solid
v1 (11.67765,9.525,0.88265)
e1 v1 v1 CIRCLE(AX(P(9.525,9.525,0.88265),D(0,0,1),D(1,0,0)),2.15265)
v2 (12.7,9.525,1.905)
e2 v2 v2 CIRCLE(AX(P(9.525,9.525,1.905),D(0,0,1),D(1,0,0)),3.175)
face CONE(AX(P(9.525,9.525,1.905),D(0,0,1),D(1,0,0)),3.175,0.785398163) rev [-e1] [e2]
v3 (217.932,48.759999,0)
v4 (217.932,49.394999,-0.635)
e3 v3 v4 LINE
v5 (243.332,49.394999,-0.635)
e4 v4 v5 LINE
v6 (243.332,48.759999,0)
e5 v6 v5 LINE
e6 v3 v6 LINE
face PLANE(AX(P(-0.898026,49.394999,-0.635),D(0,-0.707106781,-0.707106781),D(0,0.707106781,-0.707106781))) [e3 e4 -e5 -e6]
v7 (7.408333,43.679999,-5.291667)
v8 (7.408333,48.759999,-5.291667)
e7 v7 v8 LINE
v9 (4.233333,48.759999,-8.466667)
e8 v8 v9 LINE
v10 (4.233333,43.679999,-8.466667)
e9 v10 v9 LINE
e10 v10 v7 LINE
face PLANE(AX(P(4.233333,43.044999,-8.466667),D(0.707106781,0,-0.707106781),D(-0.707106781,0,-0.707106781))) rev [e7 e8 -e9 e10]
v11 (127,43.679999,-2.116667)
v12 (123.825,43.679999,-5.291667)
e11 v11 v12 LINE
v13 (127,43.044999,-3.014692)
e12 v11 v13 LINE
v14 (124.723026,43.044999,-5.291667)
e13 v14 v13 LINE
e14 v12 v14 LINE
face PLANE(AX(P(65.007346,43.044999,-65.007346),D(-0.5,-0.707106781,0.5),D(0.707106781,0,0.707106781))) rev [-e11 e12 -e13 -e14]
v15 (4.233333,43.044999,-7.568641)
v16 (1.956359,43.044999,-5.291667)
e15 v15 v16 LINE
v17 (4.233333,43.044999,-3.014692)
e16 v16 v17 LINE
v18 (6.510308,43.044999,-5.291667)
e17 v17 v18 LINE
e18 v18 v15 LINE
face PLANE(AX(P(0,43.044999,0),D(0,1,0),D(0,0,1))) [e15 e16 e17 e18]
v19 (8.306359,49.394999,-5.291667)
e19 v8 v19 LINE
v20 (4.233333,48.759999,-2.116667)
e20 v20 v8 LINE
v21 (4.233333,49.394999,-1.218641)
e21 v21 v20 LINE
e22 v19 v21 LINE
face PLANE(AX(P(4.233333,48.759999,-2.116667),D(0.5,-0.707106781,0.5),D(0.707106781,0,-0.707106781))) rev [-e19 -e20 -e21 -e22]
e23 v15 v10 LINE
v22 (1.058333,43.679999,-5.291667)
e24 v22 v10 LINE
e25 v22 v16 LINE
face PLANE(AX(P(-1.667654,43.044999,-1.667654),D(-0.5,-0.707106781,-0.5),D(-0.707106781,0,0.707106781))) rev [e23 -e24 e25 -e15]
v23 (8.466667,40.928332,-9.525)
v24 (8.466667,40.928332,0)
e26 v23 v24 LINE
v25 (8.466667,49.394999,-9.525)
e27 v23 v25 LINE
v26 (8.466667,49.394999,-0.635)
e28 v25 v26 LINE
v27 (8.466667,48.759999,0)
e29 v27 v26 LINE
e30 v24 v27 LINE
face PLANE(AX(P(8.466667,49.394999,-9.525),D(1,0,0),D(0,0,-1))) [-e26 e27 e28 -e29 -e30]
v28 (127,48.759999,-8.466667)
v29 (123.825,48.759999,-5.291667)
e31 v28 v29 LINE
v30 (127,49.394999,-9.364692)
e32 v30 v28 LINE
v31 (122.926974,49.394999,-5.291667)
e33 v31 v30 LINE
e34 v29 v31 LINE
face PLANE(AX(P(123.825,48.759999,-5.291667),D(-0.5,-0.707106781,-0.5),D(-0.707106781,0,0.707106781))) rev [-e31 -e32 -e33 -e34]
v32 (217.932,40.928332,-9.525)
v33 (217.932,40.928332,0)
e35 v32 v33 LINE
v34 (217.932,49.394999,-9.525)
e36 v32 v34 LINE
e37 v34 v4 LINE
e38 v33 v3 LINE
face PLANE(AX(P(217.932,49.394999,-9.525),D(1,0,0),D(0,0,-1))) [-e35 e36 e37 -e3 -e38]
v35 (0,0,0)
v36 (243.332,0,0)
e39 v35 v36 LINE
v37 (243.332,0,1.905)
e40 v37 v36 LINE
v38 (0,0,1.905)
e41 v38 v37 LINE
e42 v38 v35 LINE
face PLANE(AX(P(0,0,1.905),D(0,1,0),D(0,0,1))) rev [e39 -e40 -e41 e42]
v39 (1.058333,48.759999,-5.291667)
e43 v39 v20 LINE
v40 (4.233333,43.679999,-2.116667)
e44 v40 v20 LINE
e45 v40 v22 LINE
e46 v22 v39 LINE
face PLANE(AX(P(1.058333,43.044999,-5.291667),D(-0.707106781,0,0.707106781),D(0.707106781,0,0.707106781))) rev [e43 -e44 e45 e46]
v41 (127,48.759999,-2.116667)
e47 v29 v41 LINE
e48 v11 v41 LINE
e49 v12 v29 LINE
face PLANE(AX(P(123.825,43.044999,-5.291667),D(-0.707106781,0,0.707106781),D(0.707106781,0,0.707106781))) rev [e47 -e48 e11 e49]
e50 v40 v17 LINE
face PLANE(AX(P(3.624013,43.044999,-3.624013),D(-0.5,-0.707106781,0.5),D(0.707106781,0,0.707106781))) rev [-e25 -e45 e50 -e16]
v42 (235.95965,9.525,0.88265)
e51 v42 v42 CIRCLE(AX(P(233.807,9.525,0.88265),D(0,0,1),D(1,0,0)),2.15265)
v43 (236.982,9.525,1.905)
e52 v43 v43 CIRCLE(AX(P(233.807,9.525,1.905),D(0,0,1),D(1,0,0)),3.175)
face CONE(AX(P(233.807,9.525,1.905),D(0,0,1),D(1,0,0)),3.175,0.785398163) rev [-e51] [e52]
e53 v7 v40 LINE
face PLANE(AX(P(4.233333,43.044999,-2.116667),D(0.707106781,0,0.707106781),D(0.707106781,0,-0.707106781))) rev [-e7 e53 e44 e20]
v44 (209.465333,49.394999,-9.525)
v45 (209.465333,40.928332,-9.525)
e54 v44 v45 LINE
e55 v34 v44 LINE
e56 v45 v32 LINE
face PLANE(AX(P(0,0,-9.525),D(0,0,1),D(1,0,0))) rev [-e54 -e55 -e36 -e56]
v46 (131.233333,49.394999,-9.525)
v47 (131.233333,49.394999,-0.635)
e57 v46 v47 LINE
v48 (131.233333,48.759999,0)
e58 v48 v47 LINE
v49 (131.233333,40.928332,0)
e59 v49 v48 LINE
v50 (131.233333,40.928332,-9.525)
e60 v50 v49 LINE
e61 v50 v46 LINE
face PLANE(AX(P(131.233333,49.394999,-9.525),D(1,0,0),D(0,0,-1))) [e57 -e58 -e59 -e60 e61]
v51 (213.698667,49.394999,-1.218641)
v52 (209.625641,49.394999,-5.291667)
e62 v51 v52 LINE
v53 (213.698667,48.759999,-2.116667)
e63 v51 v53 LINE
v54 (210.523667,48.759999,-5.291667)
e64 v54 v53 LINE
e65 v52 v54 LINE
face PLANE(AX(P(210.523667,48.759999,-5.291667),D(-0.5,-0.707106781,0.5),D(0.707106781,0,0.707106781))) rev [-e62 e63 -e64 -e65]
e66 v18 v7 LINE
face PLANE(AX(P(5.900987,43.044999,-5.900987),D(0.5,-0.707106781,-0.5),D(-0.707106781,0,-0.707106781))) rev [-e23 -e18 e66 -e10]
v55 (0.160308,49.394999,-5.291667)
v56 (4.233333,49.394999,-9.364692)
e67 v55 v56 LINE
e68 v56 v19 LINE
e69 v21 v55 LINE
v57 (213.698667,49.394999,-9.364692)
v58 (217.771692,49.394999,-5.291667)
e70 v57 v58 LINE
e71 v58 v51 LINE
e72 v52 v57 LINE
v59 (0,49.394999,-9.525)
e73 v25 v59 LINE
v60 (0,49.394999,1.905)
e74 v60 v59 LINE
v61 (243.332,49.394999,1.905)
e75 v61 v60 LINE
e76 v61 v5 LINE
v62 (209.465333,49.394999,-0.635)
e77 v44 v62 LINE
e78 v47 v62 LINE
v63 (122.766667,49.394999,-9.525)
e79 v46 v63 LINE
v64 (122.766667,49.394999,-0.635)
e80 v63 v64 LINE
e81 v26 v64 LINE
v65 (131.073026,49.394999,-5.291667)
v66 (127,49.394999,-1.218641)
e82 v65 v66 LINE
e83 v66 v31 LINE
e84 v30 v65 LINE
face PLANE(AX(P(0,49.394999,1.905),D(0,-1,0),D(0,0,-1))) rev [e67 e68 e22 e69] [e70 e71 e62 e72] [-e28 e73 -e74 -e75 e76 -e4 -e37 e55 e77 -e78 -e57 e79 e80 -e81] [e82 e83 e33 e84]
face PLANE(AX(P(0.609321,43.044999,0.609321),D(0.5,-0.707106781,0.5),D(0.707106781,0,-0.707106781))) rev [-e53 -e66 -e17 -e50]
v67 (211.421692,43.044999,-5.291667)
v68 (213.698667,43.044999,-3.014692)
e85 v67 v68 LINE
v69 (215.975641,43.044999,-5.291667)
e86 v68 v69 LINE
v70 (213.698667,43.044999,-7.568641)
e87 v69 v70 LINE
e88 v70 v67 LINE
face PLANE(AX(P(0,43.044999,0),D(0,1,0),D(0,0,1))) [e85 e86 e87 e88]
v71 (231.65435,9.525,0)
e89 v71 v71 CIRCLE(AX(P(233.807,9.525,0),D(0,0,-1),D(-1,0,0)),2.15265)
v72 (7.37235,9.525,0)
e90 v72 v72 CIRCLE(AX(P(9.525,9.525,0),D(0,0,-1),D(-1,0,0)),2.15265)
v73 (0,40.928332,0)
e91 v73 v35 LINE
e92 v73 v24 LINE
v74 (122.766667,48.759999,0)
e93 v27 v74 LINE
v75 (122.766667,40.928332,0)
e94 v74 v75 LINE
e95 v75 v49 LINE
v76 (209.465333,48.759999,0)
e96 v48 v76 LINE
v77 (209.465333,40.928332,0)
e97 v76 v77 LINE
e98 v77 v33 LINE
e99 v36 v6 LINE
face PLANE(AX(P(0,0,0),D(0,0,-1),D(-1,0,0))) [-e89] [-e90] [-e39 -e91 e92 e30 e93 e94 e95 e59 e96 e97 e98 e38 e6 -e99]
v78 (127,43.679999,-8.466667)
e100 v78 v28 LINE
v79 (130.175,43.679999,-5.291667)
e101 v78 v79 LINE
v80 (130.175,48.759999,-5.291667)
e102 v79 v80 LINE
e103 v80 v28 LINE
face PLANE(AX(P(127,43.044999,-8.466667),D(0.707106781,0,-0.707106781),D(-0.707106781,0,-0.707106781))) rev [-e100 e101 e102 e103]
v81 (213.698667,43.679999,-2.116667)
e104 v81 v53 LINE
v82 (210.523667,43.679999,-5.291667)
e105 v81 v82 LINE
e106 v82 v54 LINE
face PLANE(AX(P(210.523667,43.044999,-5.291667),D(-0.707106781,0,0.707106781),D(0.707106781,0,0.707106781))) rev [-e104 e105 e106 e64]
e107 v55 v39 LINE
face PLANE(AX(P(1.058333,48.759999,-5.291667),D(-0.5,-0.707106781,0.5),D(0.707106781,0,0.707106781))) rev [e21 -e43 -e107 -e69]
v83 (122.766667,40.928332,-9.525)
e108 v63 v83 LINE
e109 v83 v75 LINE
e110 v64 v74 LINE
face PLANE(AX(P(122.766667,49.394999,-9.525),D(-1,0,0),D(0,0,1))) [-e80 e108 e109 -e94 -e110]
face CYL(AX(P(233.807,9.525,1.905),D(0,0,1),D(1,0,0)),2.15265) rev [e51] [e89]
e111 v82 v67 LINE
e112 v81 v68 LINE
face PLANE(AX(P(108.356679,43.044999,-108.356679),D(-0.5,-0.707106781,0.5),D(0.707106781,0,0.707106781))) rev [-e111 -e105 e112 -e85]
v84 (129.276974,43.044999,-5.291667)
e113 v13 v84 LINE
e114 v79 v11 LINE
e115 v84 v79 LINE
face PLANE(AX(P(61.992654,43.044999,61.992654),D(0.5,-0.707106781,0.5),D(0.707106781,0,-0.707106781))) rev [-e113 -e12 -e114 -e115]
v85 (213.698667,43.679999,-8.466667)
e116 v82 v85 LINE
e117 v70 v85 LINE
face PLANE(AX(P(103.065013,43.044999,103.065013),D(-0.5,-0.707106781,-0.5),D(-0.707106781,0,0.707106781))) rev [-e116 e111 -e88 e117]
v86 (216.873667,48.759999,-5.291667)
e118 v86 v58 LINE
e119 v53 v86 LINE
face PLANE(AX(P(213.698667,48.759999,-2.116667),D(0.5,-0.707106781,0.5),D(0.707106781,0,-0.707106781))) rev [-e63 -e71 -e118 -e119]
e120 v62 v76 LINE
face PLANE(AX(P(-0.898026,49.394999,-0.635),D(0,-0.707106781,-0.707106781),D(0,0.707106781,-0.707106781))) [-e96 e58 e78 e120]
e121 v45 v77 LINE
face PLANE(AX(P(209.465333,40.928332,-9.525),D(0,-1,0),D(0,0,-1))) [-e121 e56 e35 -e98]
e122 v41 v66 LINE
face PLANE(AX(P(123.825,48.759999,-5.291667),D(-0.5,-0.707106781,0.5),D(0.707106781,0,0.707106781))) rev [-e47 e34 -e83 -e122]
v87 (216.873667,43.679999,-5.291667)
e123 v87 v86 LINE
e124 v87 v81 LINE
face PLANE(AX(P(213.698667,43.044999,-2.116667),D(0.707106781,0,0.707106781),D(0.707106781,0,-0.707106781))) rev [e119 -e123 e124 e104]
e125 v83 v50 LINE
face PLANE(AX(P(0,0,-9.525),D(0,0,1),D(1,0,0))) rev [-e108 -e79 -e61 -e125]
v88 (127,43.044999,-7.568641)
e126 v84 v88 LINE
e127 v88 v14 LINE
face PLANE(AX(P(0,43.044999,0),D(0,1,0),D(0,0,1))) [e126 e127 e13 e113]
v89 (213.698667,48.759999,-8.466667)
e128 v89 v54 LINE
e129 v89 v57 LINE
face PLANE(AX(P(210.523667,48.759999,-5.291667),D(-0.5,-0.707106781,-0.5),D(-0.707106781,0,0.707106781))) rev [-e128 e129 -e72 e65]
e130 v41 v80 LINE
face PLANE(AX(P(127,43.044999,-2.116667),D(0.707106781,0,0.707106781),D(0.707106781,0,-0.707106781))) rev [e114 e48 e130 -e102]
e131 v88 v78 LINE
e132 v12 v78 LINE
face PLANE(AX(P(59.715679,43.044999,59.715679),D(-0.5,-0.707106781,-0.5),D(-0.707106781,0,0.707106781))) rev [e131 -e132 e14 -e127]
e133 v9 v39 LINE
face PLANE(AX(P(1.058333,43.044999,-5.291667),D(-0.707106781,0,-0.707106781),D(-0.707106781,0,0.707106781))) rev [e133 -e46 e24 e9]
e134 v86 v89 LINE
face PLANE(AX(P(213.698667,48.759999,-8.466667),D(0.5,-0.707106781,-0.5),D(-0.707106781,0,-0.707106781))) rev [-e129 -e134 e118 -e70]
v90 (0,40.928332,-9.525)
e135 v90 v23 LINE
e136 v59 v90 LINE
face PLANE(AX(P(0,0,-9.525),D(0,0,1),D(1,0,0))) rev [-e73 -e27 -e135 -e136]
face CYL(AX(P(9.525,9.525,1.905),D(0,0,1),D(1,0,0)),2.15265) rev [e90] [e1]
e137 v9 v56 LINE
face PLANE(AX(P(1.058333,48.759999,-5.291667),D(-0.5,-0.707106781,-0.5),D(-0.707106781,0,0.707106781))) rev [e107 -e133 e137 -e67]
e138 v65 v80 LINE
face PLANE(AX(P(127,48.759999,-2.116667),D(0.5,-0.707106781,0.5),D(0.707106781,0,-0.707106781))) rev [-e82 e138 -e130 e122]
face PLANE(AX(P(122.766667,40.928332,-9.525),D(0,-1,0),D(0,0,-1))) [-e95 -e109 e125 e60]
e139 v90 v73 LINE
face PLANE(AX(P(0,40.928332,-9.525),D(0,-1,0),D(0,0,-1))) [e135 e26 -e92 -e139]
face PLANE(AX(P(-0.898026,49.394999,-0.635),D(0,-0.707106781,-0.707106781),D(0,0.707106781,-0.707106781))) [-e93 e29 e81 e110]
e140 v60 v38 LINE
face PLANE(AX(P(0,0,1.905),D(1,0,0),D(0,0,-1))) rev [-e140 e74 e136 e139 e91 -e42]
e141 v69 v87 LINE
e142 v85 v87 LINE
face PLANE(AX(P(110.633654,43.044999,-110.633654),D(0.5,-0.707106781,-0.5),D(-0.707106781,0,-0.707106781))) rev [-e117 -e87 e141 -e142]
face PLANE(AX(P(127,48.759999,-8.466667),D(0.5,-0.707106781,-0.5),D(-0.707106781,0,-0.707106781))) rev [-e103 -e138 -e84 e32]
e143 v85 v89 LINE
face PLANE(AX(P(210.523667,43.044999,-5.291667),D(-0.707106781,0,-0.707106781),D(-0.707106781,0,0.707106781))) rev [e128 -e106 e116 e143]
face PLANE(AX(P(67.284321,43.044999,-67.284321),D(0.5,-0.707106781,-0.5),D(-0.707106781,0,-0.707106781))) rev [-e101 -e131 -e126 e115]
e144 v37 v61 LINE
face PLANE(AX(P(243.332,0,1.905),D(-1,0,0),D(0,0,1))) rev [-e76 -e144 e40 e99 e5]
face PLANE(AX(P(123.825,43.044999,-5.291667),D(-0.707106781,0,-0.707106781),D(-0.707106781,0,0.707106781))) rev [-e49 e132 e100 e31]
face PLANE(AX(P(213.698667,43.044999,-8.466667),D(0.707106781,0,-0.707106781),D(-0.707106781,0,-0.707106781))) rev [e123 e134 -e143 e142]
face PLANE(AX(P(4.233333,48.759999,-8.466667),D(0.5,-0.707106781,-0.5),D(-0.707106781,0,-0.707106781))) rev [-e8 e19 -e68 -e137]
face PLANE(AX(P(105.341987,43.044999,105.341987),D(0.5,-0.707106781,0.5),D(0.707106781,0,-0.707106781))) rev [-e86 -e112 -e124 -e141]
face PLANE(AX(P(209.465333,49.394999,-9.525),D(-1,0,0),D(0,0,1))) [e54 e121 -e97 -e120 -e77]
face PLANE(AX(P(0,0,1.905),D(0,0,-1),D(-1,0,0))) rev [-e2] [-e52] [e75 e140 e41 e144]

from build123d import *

# Parameters (mm, degrees)
SKETCH1_W                       = 243.332
SKETCH1_H                       = 49.394999
BOSS_EXTRUDE1_DEPTH             = 1.905
SKETCH2_W                       = 8.466666667
SKETCH2_H                       = 8.466666667
SKETCH2_W_2                     = 8.466666666
BOSS_EXTRUDE2_DEPTH             = 9.525
CUT_EXTRUDE1_DEPTH              = 6.35
CHAMFER1_SIZE                   = 0.635
BOSS_EXTRUDE3_START             = -234.865333
BOSS_EXTRUDE3_DEPTH             = 234.865333
F_6_CLEARANCE_HOLE1_D           = 4.3053
F_6_CLEARANCE_HOLE1_CSINK_D     = 6.35
F_6_CLEARANCE_HOLE1_CSINK_ANGLE = 90


with BuildPart() as part:
    # Sketch1 → Boss-Extrude1 (new body)
    with BuildSketch(Plane.XY):
        with Locations((121.666, 24.6974995)):
            Rectangle(SKETCH1_W, SKETCH1_H)
    extrude(amount=BOSS_EXTRUDE1_DEPTH)

    # Sketch2 → Boss-Extrude2 (add)
    with BuildSketch(Plane.XY):
        with Locations((4.233333334, 45.161665666)):
            Rectangle(SKETCH2_W, SKETCH2_H)
        with Locations((127, 45.161665666)):
            Rectangle(SKETCH2_W_2, SKETCH2_H)
        with Locations((213.698666667, 45.161665666)):
            Rectangle(SKETCH2_W, SKETCH2_H)
    extrude(amount=-BOSS_EXTRUDE2_DEPTH)

    # Sketch3 → Cut-Extrude1 (cut)
    with BuildSketch(Plane(origin=(0, 49.394999, 0), x_dir=(1, 0, 0), z_dir=(0, 1, 0))):
        Polygon((1.058333333, 5.291666667), (4.233333333, 8.466666667), (7.408333333, 5.291666667), (4.233333333, 2.116666667), align=None)
        Polygon((123.825, 5.291666667), (127, 8.466666667), (130.175, 5.291666667), (127, 2.116666667), align=None)
        Polygon((210.523666667, 5.291666667), (213.698666667, 8.466666667), (216.873666667, 5.291666667), (213.698666667, 2.116666667), align=None)
    extrude(amount=-CUT_EXTRUDE1_DEPTH, mode=Mode.SUBTRACT)

    # Chamfer1
    chamfer1_edges = [part.edges().sort_by_distance(p)[0] for p in [
        (2.645833333, 43.044999, -3.704166667),
        (2.645833333, 43.044999, -6.879166667),
        (5.820833333, 43.044999, -6.879166667),
        (5.820833333, 43.044999, -3.704166667),
        (2.645833333, 49.394999, -3.704166667),
        (5.820833333, 49.394999, -3.704166667),
        (5.820833333, 49.394999, -6.879166667),
        (2.645833333, 49.394999, -6.879166667),
        (125.4125, 43.044999, -3.704166667),
        (125.4125, 43.044999, -6.879166667),
        (128.5875, 43.044999, -6.879166667),
        (128.5875, 43.044999, -3.704166667),
        (125.4125, 49.394999, -3.704166667),
        (128.5875, 49.394999, -3.704166667),
        (128.5875, 49.394999, -6.879166667),
        (125.4125, 49.394999, -6.879166667),
        (212.111166667, 43.044999, -3.704166667),
        (212.111166667, 43.044999, -6.879166667),
        (215.286166667, 43.044999, -6.879166667),
        (215.286166667, 43.044999, -3.704166667),
        (212.111166667, 49.394999, -3.704166667),
        (215.286166667, 49.394999, -3.704166667),
        (215.286166667, 49.394999, -6.879166667),
        (212.111166667, 49.394999, -6.879166667),
    ]]
    chamfer(chamfer1_edges, length=CHAMFER1_SIZE)


with BuildPart() as boss_extrude3_tool:
    # Sketch4 → Boss-Extrude3 (new body)
    with BuildSketch(Plane(origin=(243.332, 0, 0), x_dir=(0, 0, -1), z_dir=(1, 0, 0)).offset(BOSS_EXTRUDE3_START)):
        Polygon((0, 49.394999), (0.635, 49.394999), (0, 48.759999), align=None)
    extrude(amount=BOSS_EXTRUDE3_DEPTH)


with BuildPart() as part_1:
    add(part.part)


with BuildPart() as part_2:
    # Boss-Extrude3: joined with boss_extrude3_tool
    add(part_1.part.fuse(boss_extrude3_tool.part, tol=0.00001))

    # #6 Clearance Hole1 (through all)
    with Locations(Plane.XY.offset(1.905)):
        with Locations((9.525, 9.525), (233.807, 9.525)):
            CounterSinkHole(F_6_CLEARANCE_HOLE1_D / 2, F_6_CLEARANCE_HOLE1_CSINK_D / 2, counter_sink_angle=F_6_CLEARANCE_HOLE1_CSINK_ANGLE)


solid = part_2.part
